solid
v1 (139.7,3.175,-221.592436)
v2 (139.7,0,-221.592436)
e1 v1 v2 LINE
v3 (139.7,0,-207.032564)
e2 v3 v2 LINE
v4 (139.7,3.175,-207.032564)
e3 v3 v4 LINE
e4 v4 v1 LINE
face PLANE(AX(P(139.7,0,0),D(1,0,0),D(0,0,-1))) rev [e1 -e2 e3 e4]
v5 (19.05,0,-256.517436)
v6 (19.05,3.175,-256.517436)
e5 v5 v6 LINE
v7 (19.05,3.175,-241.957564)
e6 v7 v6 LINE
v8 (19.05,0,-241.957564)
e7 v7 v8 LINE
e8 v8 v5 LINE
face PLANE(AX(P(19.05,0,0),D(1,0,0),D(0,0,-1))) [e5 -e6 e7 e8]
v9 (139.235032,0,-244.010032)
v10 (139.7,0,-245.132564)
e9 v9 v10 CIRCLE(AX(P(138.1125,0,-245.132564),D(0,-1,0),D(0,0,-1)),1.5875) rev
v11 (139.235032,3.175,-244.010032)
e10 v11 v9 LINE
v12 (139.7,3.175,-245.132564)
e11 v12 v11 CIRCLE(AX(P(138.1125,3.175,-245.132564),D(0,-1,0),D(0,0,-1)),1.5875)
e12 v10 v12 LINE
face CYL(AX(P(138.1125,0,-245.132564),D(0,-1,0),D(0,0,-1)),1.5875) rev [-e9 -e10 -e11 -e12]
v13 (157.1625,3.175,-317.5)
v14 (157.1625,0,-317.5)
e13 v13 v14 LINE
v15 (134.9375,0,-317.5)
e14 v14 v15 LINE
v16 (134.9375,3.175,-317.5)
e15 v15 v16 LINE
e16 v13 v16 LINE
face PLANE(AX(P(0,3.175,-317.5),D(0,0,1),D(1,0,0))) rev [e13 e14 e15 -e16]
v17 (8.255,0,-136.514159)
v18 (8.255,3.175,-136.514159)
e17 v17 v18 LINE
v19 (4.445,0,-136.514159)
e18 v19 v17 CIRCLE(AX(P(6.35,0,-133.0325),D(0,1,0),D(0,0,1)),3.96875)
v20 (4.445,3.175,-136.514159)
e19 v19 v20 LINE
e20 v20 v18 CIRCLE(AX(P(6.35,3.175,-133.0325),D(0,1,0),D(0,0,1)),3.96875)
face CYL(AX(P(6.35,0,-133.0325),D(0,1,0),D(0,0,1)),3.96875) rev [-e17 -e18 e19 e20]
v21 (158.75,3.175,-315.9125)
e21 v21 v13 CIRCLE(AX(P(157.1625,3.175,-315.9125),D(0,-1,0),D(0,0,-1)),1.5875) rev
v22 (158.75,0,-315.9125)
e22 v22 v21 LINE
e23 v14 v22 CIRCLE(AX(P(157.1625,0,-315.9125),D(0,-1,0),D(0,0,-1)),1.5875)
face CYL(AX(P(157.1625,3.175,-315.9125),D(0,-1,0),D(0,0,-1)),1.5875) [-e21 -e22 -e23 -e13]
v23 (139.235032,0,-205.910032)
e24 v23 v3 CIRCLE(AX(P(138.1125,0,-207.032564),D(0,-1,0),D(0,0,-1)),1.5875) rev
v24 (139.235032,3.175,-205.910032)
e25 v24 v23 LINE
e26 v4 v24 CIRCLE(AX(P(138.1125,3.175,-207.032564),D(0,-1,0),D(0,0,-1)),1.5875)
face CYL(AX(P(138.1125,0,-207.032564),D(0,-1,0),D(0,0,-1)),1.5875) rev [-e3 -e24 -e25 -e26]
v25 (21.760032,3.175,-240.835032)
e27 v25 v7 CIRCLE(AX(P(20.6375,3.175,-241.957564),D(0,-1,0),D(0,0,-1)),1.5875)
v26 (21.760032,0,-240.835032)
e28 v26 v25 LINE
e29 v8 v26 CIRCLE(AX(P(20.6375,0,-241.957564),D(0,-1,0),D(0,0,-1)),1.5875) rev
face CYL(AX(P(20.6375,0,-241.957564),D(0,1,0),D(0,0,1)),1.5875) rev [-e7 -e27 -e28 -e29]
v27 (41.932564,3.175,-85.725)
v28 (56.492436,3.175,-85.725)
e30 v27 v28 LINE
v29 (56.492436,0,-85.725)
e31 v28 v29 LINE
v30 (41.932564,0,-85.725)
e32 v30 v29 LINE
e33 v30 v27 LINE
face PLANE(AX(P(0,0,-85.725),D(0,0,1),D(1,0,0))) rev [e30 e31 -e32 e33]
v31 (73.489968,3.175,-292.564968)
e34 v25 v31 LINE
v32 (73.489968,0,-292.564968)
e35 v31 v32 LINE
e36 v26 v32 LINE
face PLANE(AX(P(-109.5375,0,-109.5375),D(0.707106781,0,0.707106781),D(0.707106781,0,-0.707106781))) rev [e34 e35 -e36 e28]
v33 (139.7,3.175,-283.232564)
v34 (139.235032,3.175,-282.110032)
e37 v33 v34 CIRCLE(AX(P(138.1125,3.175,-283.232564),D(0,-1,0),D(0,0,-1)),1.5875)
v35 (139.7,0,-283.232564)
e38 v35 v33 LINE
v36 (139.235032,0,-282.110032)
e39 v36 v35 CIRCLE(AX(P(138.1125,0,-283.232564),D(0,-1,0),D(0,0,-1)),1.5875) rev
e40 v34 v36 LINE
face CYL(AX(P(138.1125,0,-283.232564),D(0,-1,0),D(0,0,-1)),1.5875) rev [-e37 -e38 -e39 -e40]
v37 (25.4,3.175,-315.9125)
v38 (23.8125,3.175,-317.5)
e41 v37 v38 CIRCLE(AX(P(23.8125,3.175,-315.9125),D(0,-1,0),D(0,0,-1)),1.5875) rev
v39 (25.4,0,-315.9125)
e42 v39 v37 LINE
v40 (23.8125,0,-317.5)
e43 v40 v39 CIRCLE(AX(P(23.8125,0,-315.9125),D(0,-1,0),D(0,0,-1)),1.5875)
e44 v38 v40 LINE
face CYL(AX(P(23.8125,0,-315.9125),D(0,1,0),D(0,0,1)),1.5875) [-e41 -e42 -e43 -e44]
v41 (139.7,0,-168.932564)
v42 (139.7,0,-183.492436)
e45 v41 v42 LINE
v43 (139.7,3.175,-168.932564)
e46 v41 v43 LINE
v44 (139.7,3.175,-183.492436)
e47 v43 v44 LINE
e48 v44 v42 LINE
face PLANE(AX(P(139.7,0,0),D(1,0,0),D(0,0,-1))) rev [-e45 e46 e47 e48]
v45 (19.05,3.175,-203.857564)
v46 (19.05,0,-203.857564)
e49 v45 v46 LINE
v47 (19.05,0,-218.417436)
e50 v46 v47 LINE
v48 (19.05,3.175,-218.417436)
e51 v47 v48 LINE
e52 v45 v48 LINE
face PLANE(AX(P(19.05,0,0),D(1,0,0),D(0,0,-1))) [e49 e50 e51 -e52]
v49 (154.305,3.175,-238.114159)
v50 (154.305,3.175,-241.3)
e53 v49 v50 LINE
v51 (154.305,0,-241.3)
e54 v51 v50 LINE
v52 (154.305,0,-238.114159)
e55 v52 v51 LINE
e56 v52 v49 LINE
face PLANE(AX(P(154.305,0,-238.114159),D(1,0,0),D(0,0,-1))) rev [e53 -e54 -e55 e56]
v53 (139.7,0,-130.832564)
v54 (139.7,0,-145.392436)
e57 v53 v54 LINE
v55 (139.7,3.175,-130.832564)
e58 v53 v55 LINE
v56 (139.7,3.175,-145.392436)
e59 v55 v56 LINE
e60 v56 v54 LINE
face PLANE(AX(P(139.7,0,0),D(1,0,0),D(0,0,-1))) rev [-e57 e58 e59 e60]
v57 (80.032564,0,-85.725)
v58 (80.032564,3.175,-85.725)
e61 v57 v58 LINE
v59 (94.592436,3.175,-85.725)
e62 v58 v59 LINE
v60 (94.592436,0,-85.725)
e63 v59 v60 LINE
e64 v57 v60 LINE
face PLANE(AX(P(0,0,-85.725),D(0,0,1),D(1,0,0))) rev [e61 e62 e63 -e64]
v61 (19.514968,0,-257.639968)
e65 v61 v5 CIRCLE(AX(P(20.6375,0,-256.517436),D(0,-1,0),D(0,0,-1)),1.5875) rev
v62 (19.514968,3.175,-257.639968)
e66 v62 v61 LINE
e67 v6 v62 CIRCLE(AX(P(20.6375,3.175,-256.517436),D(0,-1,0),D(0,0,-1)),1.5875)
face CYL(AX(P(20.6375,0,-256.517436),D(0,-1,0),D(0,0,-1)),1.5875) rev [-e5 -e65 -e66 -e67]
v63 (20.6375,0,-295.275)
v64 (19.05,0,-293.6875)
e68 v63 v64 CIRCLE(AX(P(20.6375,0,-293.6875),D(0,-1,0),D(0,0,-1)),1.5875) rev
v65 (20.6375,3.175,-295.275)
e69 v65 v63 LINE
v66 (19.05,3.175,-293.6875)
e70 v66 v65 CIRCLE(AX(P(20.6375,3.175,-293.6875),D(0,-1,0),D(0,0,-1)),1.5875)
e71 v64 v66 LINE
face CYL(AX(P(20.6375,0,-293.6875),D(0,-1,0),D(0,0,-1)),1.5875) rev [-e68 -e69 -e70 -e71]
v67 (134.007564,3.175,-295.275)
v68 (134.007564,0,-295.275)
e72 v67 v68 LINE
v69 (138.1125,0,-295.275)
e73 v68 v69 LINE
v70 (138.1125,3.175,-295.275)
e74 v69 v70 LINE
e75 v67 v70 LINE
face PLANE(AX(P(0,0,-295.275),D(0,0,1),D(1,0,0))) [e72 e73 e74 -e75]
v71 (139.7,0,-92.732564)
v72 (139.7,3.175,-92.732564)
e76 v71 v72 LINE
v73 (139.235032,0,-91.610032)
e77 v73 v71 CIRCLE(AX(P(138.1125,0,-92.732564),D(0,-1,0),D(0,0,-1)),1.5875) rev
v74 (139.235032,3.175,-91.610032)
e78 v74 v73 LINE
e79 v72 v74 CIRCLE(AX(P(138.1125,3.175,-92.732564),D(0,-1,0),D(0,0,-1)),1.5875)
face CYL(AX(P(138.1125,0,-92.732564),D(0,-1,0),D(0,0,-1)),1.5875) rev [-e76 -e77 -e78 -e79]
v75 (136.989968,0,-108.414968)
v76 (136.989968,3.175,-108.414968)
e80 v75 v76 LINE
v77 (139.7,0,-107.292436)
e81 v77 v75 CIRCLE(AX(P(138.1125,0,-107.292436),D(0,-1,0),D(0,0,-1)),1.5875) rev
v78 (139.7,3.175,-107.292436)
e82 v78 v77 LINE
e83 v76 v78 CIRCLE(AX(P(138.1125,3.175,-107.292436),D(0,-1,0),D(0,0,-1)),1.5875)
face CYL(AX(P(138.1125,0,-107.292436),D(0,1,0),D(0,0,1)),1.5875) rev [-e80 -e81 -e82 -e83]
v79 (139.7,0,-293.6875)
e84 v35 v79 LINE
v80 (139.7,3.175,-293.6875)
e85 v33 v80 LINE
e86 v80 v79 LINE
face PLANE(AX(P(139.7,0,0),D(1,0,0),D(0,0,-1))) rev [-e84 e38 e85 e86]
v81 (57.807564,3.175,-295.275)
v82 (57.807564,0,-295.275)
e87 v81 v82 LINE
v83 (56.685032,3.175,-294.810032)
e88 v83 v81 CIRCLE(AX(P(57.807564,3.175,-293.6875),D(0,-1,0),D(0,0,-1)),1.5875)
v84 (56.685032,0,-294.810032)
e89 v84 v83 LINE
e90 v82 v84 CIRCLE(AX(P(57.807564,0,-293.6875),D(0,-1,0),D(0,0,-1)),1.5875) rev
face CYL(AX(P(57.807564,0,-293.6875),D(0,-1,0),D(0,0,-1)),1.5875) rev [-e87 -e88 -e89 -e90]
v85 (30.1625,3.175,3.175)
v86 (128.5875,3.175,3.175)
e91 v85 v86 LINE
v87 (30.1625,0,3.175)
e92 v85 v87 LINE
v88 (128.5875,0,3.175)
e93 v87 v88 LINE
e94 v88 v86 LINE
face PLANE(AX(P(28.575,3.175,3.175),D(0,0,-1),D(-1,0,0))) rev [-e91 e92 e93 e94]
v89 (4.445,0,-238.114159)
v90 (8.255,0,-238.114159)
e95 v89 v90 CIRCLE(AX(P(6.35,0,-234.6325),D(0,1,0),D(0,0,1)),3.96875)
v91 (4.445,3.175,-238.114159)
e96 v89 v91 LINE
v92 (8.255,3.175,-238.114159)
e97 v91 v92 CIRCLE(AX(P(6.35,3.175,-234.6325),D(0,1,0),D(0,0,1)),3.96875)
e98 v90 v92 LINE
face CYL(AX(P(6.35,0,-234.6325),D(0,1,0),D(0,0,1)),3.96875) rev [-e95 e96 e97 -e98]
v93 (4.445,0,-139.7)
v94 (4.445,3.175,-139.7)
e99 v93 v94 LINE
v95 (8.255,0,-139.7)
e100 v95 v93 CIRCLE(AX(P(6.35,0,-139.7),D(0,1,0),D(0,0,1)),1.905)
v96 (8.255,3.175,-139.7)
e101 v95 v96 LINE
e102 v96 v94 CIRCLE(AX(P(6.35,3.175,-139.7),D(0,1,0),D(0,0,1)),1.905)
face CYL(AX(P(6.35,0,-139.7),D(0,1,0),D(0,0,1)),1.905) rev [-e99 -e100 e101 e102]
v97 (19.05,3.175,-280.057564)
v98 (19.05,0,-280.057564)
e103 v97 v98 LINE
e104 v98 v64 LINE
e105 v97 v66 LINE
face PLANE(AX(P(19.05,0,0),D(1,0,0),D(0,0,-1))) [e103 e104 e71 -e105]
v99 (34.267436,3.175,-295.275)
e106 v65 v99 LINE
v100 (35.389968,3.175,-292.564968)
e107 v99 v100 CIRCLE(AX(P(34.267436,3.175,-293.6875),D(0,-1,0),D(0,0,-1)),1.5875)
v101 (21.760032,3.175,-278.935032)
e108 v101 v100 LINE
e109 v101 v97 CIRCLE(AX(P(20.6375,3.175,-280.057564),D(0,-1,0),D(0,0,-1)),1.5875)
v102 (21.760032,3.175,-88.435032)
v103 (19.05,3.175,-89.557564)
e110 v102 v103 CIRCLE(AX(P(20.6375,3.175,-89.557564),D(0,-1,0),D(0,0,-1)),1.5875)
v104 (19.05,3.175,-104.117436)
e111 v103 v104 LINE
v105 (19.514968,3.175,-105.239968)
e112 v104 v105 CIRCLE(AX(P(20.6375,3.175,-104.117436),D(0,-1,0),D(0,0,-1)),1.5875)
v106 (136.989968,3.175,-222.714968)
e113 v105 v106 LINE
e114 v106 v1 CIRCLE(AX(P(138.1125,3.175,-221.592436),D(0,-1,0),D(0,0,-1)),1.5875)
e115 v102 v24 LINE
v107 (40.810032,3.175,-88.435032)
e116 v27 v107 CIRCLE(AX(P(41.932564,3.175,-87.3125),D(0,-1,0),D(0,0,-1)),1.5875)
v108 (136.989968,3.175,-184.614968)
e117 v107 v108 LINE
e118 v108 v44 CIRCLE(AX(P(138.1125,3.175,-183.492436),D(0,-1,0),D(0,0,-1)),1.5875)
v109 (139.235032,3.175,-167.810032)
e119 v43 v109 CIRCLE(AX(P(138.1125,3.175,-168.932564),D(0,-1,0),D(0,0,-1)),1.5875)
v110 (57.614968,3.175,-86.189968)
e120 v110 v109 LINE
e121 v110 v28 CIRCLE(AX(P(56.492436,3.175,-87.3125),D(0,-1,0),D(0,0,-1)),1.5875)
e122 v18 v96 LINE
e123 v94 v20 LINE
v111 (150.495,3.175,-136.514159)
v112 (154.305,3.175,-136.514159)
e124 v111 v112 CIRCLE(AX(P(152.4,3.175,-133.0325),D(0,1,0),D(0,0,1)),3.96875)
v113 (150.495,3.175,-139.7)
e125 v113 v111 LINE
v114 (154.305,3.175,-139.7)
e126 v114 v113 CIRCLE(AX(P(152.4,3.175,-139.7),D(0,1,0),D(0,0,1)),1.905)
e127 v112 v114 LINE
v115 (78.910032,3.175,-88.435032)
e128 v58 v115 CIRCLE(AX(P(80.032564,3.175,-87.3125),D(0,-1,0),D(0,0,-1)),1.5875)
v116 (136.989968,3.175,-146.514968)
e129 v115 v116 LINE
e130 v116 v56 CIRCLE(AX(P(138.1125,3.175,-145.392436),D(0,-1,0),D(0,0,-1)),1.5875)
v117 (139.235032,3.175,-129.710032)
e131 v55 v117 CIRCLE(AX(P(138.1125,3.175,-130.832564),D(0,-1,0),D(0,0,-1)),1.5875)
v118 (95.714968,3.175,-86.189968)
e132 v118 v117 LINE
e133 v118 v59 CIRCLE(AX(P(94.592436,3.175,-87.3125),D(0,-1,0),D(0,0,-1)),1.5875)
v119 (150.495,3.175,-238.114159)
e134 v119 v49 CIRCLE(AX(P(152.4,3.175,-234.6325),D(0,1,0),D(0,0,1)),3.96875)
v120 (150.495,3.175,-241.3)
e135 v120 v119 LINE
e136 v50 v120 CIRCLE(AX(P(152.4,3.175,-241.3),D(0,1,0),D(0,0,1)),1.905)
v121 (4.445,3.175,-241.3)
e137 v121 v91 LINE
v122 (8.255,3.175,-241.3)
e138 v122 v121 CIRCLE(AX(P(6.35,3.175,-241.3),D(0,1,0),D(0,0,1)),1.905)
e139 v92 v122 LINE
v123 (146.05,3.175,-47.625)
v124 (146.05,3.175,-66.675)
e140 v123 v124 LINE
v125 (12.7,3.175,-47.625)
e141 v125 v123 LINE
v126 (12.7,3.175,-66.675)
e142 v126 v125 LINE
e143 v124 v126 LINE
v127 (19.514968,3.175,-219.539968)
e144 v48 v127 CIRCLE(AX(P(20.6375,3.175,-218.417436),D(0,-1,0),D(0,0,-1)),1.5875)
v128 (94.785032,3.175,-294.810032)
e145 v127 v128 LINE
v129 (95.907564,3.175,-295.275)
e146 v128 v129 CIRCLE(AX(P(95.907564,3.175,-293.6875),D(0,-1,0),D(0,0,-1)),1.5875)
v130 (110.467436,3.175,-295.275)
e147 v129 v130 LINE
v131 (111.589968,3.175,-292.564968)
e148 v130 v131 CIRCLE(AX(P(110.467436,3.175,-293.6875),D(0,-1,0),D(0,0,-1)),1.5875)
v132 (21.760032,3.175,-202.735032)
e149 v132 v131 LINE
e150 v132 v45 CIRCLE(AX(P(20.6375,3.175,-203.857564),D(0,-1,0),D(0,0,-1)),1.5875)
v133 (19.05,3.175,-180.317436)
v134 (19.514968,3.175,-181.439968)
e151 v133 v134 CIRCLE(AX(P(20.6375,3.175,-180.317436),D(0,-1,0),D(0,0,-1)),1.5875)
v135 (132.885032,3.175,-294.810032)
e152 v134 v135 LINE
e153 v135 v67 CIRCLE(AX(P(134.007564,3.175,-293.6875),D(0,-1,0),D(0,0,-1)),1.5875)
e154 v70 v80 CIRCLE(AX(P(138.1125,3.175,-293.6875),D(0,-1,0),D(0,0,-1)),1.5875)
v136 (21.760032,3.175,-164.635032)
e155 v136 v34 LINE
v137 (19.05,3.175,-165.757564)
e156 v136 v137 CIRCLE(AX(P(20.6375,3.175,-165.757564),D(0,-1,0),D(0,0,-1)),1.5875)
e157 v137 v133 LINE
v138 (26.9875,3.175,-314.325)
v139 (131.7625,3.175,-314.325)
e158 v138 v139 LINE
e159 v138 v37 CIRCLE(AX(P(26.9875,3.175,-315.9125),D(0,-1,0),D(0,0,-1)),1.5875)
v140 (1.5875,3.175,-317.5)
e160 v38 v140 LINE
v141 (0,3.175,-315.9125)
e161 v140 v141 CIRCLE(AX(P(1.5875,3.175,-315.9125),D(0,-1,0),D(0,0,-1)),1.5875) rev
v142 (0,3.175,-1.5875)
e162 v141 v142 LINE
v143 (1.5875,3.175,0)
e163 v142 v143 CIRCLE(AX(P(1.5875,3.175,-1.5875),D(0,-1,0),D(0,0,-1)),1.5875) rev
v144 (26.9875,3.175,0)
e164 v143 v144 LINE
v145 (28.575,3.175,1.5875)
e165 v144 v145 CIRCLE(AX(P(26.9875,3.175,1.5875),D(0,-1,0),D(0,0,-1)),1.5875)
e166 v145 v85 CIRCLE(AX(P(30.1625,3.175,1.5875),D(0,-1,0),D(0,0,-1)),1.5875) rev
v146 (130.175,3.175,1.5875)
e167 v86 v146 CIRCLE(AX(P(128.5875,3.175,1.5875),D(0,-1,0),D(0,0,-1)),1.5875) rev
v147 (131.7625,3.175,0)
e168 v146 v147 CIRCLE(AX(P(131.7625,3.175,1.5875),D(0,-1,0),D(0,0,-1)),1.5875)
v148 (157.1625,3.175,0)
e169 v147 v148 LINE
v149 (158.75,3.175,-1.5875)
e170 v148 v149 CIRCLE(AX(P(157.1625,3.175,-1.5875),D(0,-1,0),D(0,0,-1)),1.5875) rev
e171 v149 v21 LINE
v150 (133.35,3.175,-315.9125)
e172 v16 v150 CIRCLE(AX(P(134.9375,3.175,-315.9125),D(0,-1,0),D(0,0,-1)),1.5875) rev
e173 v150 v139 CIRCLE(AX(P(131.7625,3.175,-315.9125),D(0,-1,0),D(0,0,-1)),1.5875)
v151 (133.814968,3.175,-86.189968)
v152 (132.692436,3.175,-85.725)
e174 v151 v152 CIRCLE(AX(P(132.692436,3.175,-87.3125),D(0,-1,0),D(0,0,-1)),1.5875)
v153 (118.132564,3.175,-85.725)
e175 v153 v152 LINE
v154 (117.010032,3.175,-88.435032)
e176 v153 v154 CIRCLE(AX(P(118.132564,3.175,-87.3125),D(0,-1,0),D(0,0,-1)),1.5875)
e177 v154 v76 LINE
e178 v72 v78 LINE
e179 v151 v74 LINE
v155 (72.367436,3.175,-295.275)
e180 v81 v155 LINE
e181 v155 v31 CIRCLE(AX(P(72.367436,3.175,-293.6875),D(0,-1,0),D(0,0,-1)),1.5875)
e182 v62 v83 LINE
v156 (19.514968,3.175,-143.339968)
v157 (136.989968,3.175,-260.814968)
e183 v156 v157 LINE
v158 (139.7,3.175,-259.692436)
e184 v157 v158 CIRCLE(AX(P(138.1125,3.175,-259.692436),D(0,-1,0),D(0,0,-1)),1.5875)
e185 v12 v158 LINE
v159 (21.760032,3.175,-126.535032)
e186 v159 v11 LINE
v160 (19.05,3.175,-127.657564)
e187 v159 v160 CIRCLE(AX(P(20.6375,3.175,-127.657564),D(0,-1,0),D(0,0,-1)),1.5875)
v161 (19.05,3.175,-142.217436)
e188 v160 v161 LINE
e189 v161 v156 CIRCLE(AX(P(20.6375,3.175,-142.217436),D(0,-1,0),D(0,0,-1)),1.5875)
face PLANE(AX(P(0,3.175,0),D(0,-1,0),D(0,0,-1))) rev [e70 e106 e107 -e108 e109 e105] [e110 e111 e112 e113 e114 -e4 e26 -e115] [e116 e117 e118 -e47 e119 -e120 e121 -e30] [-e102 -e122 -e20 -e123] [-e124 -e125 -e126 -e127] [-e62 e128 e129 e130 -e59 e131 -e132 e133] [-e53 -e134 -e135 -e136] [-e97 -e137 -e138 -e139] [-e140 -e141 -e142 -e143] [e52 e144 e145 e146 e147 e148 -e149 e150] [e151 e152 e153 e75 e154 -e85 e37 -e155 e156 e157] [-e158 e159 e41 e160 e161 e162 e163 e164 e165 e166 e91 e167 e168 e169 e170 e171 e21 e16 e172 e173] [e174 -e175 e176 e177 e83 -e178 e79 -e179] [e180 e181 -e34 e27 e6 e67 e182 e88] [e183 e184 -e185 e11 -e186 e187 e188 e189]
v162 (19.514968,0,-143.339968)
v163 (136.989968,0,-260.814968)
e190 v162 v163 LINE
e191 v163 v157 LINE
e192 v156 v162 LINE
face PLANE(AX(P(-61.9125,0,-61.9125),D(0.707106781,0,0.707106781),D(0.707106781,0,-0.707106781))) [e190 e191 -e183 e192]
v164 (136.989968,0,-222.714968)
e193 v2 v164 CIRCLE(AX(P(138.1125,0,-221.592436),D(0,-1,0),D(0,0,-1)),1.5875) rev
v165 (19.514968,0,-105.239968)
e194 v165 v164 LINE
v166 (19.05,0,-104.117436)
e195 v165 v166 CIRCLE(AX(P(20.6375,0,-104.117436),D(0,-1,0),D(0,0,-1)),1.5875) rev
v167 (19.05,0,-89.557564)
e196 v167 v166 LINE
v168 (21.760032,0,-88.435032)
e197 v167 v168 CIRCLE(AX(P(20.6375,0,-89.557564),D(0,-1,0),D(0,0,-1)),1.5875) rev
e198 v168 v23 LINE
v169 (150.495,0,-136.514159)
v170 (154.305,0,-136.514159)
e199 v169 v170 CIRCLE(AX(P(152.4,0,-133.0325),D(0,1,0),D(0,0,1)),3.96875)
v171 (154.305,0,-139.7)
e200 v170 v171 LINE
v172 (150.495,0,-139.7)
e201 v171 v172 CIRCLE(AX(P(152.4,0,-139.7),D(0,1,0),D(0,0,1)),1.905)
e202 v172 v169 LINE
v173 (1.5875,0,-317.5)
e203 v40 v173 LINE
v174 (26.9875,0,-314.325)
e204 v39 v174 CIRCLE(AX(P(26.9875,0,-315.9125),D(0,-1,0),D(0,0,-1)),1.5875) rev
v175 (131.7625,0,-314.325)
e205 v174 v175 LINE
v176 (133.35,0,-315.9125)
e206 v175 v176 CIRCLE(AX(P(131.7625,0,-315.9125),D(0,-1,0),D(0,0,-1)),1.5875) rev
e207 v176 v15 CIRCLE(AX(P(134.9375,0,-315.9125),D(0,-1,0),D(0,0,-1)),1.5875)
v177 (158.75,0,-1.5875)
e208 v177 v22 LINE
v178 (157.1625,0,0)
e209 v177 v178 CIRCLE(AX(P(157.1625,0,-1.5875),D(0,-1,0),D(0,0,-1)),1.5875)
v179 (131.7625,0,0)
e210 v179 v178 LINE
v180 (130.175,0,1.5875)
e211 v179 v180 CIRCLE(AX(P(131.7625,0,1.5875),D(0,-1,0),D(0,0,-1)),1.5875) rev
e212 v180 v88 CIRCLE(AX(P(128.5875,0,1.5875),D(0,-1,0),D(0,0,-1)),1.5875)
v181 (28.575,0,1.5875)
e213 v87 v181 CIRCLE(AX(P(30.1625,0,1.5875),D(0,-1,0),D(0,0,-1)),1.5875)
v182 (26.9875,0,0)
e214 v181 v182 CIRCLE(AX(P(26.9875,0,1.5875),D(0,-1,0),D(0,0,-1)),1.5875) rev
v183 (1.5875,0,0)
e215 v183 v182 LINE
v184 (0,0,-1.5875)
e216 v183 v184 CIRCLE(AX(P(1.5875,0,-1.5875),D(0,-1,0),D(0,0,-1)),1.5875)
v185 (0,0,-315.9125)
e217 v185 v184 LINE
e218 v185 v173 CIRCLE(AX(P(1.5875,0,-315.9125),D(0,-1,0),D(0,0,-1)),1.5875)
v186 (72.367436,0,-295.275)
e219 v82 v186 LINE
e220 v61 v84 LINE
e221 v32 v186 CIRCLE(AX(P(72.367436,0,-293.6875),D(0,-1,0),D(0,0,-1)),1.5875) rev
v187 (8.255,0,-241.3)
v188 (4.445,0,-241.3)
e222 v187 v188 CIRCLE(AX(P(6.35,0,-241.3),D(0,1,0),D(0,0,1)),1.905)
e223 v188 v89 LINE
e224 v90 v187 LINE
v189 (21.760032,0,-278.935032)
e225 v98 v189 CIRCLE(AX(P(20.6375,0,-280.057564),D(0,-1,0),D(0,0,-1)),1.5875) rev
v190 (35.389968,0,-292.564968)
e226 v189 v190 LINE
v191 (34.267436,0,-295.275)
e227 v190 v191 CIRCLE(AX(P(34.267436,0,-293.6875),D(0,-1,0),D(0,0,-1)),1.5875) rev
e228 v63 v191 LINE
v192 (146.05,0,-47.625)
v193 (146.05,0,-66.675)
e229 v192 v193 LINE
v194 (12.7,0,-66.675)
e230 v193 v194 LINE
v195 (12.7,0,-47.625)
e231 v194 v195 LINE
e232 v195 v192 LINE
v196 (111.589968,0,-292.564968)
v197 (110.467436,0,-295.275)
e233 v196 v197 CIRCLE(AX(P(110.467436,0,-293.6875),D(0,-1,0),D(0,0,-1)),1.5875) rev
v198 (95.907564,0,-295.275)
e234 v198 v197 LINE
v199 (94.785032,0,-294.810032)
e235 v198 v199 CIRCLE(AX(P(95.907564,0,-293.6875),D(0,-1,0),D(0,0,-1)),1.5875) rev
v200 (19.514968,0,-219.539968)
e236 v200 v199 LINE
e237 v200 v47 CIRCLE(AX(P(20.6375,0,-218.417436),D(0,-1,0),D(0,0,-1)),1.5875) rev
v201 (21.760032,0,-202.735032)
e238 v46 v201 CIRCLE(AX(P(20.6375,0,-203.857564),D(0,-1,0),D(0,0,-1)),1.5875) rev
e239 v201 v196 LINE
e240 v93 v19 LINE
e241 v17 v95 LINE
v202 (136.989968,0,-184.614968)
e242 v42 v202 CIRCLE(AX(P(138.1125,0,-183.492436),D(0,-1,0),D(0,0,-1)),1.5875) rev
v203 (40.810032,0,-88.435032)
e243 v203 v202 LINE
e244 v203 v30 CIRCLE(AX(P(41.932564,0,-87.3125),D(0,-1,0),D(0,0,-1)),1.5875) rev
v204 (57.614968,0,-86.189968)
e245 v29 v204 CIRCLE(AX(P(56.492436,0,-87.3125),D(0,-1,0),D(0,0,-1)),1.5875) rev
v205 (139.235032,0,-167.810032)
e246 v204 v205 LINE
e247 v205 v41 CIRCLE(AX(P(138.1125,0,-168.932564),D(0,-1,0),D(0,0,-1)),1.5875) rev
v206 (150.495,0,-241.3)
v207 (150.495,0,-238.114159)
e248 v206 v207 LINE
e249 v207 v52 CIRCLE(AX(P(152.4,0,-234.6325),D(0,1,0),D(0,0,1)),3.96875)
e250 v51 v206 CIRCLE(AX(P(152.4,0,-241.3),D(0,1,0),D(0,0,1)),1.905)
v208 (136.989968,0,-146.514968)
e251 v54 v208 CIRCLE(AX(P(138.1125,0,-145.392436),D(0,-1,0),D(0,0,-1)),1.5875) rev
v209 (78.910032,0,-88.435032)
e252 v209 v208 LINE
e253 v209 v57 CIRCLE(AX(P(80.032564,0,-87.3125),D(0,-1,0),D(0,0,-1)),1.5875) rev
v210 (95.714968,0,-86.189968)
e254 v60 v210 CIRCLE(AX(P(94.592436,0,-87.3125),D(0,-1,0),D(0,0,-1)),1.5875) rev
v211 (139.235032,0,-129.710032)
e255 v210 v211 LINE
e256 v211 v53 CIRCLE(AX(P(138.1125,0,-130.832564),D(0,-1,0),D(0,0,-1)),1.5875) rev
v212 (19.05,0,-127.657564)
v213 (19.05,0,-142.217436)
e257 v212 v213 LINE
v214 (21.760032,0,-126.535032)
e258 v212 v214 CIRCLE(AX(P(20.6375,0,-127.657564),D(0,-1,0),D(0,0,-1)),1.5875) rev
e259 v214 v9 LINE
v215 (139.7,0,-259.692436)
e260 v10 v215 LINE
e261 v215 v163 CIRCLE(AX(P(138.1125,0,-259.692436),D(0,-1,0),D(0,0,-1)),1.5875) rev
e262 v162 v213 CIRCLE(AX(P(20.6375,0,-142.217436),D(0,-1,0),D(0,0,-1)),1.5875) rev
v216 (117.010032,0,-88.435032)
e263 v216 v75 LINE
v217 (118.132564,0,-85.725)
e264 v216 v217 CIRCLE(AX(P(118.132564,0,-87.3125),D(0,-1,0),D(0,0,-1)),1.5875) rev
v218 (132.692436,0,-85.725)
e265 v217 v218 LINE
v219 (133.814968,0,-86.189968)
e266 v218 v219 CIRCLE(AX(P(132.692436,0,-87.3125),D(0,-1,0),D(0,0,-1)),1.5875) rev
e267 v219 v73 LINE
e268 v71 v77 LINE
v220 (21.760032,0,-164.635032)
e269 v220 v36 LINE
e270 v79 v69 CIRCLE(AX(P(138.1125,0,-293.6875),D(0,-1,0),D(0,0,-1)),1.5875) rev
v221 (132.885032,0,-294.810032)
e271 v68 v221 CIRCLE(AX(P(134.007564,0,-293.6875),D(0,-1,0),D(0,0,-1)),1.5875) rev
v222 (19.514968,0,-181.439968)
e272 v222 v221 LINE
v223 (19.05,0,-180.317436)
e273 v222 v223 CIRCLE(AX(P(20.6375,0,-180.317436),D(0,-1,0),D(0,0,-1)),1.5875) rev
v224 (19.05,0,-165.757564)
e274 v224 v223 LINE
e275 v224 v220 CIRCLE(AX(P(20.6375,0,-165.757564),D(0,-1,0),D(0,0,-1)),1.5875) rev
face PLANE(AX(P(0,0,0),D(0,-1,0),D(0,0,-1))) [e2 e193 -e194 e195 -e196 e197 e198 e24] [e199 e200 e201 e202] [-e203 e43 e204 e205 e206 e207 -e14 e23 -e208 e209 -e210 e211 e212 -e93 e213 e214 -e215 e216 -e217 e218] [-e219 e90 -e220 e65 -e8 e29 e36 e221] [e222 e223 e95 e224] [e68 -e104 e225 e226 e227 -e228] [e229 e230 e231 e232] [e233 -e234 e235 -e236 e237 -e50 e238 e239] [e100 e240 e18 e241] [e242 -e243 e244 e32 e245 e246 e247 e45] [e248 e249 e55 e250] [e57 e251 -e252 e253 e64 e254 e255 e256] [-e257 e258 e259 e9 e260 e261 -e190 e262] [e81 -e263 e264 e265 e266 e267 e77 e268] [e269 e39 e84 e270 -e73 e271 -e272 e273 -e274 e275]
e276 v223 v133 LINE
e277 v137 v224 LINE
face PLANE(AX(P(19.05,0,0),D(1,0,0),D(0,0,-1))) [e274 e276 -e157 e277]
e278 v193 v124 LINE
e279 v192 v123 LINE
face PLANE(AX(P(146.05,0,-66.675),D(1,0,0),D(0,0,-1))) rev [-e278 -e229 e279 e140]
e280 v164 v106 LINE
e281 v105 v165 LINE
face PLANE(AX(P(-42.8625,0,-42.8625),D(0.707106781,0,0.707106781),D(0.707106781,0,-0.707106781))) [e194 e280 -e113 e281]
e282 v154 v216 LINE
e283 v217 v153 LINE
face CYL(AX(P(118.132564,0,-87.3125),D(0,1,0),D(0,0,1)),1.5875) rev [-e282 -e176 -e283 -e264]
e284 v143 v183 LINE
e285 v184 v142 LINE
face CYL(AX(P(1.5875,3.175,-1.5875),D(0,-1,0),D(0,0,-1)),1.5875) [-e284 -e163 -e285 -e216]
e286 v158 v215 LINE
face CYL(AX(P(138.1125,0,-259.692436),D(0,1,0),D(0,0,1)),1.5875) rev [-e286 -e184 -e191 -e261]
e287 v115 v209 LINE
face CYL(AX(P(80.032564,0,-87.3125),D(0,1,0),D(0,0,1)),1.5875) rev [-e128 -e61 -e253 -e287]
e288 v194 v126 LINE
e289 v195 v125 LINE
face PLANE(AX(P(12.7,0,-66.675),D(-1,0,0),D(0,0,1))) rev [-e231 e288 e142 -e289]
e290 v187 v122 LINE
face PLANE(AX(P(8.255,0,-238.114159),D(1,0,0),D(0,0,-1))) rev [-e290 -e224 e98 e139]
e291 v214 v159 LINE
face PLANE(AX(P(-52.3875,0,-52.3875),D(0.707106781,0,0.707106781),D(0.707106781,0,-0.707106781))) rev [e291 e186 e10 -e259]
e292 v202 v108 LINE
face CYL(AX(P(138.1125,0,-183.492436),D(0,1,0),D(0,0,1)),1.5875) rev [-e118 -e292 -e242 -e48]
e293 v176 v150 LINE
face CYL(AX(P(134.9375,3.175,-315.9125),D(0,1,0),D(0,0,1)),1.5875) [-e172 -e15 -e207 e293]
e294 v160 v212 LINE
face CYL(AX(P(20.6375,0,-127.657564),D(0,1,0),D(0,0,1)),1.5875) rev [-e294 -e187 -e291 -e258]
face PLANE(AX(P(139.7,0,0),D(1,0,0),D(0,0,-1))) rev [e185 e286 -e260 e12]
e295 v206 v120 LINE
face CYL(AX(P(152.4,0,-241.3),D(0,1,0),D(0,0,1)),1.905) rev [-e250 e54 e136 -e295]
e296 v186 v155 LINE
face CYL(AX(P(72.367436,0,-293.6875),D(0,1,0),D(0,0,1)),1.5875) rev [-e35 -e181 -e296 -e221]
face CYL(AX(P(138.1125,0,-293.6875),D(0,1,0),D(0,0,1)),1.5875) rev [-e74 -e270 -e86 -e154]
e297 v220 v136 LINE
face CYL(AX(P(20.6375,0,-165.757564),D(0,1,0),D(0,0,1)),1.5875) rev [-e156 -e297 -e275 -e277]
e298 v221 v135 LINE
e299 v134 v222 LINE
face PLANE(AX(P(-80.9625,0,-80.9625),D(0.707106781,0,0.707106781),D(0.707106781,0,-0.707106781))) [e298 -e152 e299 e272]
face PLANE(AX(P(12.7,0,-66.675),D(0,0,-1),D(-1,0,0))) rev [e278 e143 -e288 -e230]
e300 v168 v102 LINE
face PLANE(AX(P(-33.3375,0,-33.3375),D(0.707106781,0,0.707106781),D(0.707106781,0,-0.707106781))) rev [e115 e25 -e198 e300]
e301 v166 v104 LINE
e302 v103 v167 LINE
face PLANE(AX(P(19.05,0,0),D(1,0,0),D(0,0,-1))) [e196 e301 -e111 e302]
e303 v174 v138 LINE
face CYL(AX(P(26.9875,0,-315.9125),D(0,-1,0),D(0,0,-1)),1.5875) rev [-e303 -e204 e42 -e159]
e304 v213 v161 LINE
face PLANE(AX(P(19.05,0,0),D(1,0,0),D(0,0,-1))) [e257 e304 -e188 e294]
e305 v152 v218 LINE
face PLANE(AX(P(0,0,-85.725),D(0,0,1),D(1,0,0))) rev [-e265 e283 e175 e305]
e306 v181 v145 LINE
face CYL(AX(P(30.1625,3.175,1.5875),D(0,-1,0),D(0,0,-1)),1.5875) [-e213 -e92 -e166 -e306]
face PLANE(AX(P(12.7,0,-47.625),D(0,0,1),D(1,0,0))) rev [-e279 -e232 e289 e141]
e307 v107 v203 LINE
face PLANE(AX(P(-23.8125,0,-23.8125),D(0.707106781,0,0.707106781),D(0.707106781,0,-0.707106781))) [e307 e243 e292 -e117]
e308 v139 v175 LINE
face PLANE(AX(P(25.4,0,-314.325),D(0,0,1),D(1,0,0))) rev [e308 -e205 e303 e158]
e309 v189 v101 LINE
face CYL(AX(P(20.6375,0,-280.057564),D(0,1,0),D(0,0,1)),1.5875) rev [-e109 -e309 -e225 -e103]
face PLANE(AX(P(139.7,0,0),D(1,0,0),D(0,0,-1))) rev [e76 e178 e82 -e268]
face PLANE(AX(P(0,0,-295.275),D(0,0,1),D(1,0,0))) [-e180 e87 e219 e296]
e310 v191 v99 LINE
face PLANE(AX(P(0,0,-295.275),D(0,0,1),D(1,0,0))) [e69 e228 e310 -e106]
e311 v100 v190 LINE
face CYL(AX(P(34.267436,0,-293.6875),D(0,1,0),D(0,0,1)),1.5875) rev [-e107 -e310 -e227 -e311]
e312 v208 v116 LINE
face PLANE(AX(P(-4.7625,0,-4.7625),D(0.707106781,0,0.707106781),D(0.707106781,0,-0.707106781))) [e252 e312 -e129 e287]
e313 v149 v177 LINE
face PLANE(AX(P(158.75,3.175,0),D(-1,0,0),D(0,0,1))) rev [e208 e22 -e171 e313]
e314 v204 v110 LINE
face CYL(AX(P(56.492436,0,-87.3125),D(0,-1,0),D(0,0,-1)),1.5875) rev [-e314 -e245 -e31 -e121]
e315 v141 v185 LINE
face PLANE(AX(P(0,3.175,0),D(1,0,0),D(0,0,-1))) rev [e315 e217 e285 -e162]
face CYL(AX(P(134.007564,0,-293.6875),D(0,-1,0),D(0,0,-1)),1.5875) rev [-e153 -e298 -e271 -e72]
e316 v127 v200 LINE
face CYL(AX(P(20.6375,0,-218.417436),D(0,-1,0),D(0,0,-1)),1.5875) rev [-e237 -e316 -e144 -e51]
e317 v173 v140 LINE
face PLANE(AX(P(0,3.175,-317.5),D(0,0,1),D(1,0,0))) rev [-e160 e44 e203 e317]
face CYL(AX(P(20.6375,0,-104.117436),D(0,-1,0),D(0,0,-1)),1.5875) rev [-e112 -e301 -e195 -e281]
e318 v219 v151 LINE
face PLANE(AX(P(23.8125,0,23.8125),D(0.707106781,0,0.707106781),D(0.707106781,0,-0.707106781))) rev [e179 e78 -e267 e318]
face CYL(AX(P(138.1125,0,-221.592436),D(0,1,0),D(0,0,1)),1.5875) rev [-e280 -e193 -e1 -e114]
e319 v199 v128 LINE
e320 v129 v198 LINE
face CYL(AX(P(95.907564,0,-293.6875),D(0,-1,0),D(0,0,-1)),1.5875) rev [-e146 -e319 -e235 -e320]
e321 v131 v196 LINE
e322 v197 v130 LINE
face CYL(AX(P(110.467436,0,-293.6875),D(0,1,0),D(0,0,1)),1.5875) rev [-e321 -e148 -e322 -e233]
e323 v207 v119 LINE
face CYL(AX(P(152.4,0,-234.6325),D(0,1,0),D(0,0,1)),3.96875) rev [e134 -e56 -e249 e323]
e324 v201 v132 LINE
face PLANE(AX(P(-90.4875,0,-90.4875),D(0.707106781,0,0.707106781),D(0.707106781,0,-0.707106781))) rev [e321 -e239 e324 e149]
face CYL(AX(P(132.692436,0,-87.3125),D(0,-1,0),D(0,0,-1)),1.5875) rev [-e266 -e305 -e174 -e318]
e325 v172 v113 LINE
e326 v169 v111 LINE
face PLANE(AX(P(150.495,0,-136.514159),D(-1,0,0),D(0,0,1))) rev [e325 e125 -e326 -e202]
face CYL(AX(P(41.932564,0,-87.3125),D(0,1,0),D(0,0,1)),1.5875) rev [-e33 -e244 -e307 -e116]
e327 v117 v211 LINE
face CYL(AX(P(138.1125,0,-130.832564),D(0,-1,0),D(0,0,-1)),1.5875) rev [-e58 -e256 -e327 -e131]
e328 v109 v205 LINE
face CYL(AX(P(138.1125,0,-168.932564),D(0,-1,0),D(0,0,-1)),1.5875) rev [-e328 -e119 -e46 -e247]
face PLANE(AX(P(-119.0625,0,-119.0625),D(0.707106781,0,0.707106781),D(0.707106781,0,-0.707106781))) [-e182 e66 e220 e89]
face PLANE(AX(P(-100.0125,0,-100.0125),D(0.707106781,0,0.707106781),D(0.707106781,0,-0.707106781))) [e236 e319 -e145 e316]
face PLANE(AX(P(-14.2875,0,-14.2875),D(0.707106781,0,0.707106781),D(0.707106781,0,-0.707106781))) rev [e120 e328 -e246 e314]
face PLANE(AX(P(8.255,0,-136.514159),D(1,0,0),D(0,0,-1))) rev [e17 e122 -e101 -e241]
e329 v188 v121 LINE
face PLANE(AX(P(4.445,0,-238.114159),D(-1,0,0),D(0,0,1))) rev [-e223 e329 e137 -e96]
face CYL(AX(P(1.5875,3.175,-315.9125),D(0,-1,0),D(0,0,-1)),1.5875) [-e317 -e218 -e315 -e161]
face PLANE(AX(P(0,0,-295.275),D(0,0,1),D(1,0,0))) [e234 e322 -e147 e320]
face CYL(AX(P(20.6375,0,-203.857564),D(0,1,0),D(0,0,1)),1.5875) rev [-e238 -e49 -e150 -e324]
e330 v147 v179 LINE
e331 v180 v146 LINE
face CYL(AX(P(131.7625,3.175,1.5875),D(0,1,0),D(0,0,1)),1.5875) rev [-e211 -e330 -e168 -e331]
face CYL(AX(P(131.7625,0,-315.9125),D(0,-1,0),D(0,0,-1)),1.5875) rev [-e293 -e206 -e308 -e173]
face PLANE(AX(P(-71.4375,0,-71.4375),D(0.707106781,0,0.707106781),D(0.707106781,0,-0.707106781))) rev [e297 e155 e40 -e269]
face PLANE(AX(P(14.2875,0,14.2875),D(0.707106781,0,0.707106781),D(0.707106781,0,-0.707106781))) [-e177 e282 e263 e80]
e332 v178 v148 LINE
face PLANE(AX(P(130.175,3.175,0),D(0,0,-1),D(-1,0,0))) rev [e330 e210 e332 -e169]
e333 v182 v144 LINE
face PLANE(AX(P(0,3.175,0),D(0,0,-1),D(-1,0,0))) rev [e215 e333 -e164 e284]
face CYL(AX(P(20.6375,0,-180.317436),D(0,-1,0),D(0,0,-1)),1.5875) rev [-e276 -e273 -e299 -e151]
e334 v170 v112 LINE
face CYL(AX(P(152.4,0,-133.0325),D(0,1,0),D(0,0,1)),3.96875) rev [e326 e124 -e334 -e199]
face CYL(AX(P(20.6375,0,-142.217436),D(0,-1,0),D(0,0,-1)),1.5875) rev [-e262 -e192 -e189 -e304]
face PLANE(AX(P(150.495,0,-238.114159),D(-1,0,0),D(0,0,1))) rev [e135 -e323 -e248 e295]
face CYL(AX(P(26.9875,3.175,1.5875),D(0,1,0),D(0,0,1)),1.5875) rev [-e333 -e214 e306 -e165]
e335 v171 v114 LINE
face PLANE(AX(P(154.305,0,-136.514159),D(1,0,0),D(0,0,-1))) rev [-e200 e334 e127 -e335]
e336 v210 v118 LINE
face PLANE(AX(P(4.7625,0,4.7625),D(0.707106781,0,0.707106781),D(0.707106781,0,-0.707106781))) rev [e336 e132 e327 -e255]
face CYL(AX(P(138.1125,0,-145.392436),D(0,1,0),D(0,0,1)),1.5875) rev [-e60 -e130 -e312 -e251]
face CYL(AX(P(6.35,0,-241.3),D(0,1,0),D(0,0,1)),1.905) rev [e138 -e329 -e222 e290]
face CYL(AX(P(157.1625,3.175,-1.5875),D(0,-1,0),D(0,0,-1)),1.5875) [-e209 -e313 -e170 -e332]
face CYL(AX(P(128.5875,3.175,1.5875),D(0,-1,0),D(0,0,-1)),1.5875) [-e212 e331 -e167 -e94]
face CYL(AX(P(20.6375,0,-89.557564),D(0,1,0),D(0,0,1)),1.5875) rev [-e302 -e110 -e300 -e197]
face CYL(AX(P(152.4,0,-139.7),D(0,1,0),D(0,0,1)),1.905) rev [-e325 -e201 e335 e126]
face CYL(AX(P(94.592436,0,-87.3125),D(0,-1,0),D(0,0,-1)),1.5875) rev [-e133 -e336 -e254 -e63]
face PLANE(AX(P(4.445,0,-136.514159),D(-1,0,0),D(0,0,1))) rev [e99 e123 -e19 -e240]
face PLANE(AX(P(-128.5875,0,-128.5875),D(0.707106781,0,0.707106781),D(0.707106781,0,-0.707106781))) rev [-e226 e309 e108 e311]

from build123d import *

# Parameters (mm, degrees)
BOSS_EXTRUDE1_DEPTH  = 3.175
SKETCH2_W            = 107.95
SKETCH2_H            = 3.175
CUT_EXTRUDE1_DEPTH   = 355.989990176
SKETCH3_W            = 133.35
SKETCH3_H            = 19.05
CUT_EXTRUDE2_DEPTH   = 355.989990176
FILLET1_R            = 1.5875
CUT_EXTRUDE3_DEPTH   = 355.989990176
LPATTERN1_COUNT      = 2
LPATTERN1_PITCH      = 101.6
LPATTERN1_COUNT_DIR2 = 2
LPATTERN1_PITCH_DIR2 = 146.05
CUT_EXTRUDE4_DEPTH   = 355.989990176
FILLET2_R            = 1.5875


with BuildPart() as part:
    # Sketch1 → Boss-Extrude1 (new body)
    with BuildSketch(Plane(origin=(0, 0, 0), x_dir=(1, 0, 0), z_dir=(0, 1, 0))):
        Polygon((130.175, 0), (158.75, 0), (158.75, 317.5), (0, 317.5), (0, 0), (28.575, 0), (28.575, -3.175), (130.175, -3.175), align=None)
    extrude(amount=BOSS_EXTRUDE1_DEPTH)

    # Sketch2 → Cut-Extrude1 (cut, through all)
    with BuildSketch(Plane(origin=(0, 3.175, 0), x_dir=(1, 0, 0), z_dir=(0, 1, 0))):
        with Locations((79.375, 315.9125)):
            Rectangle(SKETCH2_W, SKETCH2_H)
    extrude(amount=-CUT_EXTRUDE1_DEPTH, mode=Mode.SUBTRACT)

    # Sketch3 → Cut-Extrude2 (cut, through all)
    with BuildSketch(Plane(origin=(0, 3.175, 0), x_dir=(1, 0, 0), z_dir=(0, 1, 0))):
        with Locations((79.375, 57.15)):
            Rectangle(SKETCH3_W, SKETCH3_H)
    extrude(amount=-CUT_EXTRUDE2_DEPTH, mode=Mode.SUBTRACT)

    # Fillet1
    fillet1_edges = [part.edges().sort_by_distance(p)[0] for p in [
        (25.4, 1.5875, -314.325),
        (25.4, 1.5875, -317.5),
        (0, 1.5875, -317.5),
        (0, 1.5875, 0),
        (28.575, 1.5875, 0),
        (28.575, 1.5875, 3.175),
        (130.175, 1.5875, 3.175),
        (130.175, 1.5875, 0),
        (158.75, 1.5875, 0),
        (158.75, 1.5875, -317.5),
        (133.35, 1.5875, -317.5),
        (133.35, 1.5875, -314.325),
    ]]
    fillet(fillet1_edges, radius=FILLET1_R - 0.0001)  # a hair under: the kernel refuses the full size

    # Sketch4 → Cut-Extrude3 (cut, through all)
    with BuildSketch(Plane(origin=(0, 3.175, 0), x_dir=(1, 0, 0), z_dir=(0, 1, 0))):
        with BuildLine():
            Line((4.445, 238.114159312), (4.445, 241.3))
            ThreePointArc((4.445, 241.3), (6.35, 243.205), (8.255, 241.3))
            Line((8.255, 241.3), (8.255, 238.114159312))
            ThreePointArc((8.255, 238.114159312), (6.35, 230.66375), (4.445, 238.114159312))
        make_face()
    cut_extrude3 = extrude(amount=-CUT_EXTRUDE3_DEPTH, mode=Mode.SUBTRACT)

    # LPattern1: Cut-Extrude3 2 × 2
    with Locations(*[(j * LPATTERN1_PITCH_DIR2, 0, i * LPATTERN1_PITCH) for i in range(LPATTERN1_COUNT) for j in range(LPATTERN1_COUNT_DIR2) if (i, j) != (0, 0)]):
        add(cut_extrude3, mode=Mode.SUBTRACT)

    # Sketch5 → Cut-Extrude4 (cut, through all)
    with BuildSketch(Plane(origin=(0, 3.175, 0), x_dir=(1, 0, 0), z_dir=(0, 1, 0))):
        Polygon((139.7, 111.125), (114.3, 85.725), (133.35, 85.725), (139.7, 92.075), align=None)
        Polygon((139.7, 149.225), (76.2, 85.725), (95.25, 85.725), (139.7, 130.175), align=None)
        Polygon((139.7, 187.325), (38.1, 85.725), (57.15, 85.725), (139.7, 168.275), align=None)
        Polygon((19.05, 104.775), (19.05, 85.725), (139.7, 206.375), (139.7, 225.425), align=None)
        Polygon((19.05, 142.875), (19.05, 123.825), (139.7, 244.475), (139.7, 263.525), align=None)
        Polygon((19.05, 180.975), (19.05, 161.925), (139.7, 282.575), (139.7, 295.275), (133.35, 295.275), align=None)
        Polygon((19.05, 219.075), (19.05, 200.025), (114.3, 295.275), (95.25, 295.275), align=None)
        Polygon((19.05, 257.175), (19.05, 238.125), (76.2, 295.275), (57.15, 295.275), align=None)
        Polygon((19.05, 295.275), (19.05, 276.225), (38.1, 295.275), align=None)
    extrude(amount=-CUT_EXTRUDE4_DEPTH, mode=Mode.SUBTRACT)

    # Fillet2
    fillet2_edges = [part.edges().sort_by_distance(p)[0] for p in [
        (19.05, 1.5875, -104.775),
        (139.7, 1.5875, -225.425),
        (139.7, 1.5875, -206.375),
        (19.05, 1.5875, -85.725),
        (19.05, 1.5875, -142.875),
        (139.7, 1.5875, -263.525),
        (139.7, 1.5875, -244.475),
        (19.05, 1.5875, -123.825),
        (95.25, 1.5875, -85.725),
        (76.2, 1.5875, -85.725),
        (139.7, 1.5875, -149.225),
        (139.7, 1.5875, -130.175),
        (57.15, 1.5875, -85.725),
        (38.1, 1.5875, -85.725),
        (139.7, 1.5875, -187.325),
        (139.7, 1.5875, -168.275),
        (19.05, 1.5875, -257.175),
        (57.15, 1.5875, -295.275),
        (76.2, 1.5875, -295.275),
        (19.05, 1.5875, -238.125),
        (19.05, 1.5875, -276.225),
        (19.05, 1.5875, -295.275),
        (38.1, 1.5875, -295.275),
        (19.05, 1.5875, -180.975),
        (133.35, 1.5875, -295.275),
        (139.7, 1.5875, -295.275),
        (139.7, 1.5875, -282.575),
        (19.05, 1.5875, -161.925),
        (19.05, 1.5875, -219.075),
        (95.25, 1.5875, -295.275),
        (114.3, 1.5875, -295.275),
        (19.05, 1.5875, -200.025),
        (133.35, 1.5875, -85.725),
        (114.3, 1.5875, -85.725),
        (139.7, 1.5875, -111.125),
        (139.7, 1.5875, -92.075),
    ]]
    fillet(fillet2_edges, radius=FILLET2_R)


solid = part.part
